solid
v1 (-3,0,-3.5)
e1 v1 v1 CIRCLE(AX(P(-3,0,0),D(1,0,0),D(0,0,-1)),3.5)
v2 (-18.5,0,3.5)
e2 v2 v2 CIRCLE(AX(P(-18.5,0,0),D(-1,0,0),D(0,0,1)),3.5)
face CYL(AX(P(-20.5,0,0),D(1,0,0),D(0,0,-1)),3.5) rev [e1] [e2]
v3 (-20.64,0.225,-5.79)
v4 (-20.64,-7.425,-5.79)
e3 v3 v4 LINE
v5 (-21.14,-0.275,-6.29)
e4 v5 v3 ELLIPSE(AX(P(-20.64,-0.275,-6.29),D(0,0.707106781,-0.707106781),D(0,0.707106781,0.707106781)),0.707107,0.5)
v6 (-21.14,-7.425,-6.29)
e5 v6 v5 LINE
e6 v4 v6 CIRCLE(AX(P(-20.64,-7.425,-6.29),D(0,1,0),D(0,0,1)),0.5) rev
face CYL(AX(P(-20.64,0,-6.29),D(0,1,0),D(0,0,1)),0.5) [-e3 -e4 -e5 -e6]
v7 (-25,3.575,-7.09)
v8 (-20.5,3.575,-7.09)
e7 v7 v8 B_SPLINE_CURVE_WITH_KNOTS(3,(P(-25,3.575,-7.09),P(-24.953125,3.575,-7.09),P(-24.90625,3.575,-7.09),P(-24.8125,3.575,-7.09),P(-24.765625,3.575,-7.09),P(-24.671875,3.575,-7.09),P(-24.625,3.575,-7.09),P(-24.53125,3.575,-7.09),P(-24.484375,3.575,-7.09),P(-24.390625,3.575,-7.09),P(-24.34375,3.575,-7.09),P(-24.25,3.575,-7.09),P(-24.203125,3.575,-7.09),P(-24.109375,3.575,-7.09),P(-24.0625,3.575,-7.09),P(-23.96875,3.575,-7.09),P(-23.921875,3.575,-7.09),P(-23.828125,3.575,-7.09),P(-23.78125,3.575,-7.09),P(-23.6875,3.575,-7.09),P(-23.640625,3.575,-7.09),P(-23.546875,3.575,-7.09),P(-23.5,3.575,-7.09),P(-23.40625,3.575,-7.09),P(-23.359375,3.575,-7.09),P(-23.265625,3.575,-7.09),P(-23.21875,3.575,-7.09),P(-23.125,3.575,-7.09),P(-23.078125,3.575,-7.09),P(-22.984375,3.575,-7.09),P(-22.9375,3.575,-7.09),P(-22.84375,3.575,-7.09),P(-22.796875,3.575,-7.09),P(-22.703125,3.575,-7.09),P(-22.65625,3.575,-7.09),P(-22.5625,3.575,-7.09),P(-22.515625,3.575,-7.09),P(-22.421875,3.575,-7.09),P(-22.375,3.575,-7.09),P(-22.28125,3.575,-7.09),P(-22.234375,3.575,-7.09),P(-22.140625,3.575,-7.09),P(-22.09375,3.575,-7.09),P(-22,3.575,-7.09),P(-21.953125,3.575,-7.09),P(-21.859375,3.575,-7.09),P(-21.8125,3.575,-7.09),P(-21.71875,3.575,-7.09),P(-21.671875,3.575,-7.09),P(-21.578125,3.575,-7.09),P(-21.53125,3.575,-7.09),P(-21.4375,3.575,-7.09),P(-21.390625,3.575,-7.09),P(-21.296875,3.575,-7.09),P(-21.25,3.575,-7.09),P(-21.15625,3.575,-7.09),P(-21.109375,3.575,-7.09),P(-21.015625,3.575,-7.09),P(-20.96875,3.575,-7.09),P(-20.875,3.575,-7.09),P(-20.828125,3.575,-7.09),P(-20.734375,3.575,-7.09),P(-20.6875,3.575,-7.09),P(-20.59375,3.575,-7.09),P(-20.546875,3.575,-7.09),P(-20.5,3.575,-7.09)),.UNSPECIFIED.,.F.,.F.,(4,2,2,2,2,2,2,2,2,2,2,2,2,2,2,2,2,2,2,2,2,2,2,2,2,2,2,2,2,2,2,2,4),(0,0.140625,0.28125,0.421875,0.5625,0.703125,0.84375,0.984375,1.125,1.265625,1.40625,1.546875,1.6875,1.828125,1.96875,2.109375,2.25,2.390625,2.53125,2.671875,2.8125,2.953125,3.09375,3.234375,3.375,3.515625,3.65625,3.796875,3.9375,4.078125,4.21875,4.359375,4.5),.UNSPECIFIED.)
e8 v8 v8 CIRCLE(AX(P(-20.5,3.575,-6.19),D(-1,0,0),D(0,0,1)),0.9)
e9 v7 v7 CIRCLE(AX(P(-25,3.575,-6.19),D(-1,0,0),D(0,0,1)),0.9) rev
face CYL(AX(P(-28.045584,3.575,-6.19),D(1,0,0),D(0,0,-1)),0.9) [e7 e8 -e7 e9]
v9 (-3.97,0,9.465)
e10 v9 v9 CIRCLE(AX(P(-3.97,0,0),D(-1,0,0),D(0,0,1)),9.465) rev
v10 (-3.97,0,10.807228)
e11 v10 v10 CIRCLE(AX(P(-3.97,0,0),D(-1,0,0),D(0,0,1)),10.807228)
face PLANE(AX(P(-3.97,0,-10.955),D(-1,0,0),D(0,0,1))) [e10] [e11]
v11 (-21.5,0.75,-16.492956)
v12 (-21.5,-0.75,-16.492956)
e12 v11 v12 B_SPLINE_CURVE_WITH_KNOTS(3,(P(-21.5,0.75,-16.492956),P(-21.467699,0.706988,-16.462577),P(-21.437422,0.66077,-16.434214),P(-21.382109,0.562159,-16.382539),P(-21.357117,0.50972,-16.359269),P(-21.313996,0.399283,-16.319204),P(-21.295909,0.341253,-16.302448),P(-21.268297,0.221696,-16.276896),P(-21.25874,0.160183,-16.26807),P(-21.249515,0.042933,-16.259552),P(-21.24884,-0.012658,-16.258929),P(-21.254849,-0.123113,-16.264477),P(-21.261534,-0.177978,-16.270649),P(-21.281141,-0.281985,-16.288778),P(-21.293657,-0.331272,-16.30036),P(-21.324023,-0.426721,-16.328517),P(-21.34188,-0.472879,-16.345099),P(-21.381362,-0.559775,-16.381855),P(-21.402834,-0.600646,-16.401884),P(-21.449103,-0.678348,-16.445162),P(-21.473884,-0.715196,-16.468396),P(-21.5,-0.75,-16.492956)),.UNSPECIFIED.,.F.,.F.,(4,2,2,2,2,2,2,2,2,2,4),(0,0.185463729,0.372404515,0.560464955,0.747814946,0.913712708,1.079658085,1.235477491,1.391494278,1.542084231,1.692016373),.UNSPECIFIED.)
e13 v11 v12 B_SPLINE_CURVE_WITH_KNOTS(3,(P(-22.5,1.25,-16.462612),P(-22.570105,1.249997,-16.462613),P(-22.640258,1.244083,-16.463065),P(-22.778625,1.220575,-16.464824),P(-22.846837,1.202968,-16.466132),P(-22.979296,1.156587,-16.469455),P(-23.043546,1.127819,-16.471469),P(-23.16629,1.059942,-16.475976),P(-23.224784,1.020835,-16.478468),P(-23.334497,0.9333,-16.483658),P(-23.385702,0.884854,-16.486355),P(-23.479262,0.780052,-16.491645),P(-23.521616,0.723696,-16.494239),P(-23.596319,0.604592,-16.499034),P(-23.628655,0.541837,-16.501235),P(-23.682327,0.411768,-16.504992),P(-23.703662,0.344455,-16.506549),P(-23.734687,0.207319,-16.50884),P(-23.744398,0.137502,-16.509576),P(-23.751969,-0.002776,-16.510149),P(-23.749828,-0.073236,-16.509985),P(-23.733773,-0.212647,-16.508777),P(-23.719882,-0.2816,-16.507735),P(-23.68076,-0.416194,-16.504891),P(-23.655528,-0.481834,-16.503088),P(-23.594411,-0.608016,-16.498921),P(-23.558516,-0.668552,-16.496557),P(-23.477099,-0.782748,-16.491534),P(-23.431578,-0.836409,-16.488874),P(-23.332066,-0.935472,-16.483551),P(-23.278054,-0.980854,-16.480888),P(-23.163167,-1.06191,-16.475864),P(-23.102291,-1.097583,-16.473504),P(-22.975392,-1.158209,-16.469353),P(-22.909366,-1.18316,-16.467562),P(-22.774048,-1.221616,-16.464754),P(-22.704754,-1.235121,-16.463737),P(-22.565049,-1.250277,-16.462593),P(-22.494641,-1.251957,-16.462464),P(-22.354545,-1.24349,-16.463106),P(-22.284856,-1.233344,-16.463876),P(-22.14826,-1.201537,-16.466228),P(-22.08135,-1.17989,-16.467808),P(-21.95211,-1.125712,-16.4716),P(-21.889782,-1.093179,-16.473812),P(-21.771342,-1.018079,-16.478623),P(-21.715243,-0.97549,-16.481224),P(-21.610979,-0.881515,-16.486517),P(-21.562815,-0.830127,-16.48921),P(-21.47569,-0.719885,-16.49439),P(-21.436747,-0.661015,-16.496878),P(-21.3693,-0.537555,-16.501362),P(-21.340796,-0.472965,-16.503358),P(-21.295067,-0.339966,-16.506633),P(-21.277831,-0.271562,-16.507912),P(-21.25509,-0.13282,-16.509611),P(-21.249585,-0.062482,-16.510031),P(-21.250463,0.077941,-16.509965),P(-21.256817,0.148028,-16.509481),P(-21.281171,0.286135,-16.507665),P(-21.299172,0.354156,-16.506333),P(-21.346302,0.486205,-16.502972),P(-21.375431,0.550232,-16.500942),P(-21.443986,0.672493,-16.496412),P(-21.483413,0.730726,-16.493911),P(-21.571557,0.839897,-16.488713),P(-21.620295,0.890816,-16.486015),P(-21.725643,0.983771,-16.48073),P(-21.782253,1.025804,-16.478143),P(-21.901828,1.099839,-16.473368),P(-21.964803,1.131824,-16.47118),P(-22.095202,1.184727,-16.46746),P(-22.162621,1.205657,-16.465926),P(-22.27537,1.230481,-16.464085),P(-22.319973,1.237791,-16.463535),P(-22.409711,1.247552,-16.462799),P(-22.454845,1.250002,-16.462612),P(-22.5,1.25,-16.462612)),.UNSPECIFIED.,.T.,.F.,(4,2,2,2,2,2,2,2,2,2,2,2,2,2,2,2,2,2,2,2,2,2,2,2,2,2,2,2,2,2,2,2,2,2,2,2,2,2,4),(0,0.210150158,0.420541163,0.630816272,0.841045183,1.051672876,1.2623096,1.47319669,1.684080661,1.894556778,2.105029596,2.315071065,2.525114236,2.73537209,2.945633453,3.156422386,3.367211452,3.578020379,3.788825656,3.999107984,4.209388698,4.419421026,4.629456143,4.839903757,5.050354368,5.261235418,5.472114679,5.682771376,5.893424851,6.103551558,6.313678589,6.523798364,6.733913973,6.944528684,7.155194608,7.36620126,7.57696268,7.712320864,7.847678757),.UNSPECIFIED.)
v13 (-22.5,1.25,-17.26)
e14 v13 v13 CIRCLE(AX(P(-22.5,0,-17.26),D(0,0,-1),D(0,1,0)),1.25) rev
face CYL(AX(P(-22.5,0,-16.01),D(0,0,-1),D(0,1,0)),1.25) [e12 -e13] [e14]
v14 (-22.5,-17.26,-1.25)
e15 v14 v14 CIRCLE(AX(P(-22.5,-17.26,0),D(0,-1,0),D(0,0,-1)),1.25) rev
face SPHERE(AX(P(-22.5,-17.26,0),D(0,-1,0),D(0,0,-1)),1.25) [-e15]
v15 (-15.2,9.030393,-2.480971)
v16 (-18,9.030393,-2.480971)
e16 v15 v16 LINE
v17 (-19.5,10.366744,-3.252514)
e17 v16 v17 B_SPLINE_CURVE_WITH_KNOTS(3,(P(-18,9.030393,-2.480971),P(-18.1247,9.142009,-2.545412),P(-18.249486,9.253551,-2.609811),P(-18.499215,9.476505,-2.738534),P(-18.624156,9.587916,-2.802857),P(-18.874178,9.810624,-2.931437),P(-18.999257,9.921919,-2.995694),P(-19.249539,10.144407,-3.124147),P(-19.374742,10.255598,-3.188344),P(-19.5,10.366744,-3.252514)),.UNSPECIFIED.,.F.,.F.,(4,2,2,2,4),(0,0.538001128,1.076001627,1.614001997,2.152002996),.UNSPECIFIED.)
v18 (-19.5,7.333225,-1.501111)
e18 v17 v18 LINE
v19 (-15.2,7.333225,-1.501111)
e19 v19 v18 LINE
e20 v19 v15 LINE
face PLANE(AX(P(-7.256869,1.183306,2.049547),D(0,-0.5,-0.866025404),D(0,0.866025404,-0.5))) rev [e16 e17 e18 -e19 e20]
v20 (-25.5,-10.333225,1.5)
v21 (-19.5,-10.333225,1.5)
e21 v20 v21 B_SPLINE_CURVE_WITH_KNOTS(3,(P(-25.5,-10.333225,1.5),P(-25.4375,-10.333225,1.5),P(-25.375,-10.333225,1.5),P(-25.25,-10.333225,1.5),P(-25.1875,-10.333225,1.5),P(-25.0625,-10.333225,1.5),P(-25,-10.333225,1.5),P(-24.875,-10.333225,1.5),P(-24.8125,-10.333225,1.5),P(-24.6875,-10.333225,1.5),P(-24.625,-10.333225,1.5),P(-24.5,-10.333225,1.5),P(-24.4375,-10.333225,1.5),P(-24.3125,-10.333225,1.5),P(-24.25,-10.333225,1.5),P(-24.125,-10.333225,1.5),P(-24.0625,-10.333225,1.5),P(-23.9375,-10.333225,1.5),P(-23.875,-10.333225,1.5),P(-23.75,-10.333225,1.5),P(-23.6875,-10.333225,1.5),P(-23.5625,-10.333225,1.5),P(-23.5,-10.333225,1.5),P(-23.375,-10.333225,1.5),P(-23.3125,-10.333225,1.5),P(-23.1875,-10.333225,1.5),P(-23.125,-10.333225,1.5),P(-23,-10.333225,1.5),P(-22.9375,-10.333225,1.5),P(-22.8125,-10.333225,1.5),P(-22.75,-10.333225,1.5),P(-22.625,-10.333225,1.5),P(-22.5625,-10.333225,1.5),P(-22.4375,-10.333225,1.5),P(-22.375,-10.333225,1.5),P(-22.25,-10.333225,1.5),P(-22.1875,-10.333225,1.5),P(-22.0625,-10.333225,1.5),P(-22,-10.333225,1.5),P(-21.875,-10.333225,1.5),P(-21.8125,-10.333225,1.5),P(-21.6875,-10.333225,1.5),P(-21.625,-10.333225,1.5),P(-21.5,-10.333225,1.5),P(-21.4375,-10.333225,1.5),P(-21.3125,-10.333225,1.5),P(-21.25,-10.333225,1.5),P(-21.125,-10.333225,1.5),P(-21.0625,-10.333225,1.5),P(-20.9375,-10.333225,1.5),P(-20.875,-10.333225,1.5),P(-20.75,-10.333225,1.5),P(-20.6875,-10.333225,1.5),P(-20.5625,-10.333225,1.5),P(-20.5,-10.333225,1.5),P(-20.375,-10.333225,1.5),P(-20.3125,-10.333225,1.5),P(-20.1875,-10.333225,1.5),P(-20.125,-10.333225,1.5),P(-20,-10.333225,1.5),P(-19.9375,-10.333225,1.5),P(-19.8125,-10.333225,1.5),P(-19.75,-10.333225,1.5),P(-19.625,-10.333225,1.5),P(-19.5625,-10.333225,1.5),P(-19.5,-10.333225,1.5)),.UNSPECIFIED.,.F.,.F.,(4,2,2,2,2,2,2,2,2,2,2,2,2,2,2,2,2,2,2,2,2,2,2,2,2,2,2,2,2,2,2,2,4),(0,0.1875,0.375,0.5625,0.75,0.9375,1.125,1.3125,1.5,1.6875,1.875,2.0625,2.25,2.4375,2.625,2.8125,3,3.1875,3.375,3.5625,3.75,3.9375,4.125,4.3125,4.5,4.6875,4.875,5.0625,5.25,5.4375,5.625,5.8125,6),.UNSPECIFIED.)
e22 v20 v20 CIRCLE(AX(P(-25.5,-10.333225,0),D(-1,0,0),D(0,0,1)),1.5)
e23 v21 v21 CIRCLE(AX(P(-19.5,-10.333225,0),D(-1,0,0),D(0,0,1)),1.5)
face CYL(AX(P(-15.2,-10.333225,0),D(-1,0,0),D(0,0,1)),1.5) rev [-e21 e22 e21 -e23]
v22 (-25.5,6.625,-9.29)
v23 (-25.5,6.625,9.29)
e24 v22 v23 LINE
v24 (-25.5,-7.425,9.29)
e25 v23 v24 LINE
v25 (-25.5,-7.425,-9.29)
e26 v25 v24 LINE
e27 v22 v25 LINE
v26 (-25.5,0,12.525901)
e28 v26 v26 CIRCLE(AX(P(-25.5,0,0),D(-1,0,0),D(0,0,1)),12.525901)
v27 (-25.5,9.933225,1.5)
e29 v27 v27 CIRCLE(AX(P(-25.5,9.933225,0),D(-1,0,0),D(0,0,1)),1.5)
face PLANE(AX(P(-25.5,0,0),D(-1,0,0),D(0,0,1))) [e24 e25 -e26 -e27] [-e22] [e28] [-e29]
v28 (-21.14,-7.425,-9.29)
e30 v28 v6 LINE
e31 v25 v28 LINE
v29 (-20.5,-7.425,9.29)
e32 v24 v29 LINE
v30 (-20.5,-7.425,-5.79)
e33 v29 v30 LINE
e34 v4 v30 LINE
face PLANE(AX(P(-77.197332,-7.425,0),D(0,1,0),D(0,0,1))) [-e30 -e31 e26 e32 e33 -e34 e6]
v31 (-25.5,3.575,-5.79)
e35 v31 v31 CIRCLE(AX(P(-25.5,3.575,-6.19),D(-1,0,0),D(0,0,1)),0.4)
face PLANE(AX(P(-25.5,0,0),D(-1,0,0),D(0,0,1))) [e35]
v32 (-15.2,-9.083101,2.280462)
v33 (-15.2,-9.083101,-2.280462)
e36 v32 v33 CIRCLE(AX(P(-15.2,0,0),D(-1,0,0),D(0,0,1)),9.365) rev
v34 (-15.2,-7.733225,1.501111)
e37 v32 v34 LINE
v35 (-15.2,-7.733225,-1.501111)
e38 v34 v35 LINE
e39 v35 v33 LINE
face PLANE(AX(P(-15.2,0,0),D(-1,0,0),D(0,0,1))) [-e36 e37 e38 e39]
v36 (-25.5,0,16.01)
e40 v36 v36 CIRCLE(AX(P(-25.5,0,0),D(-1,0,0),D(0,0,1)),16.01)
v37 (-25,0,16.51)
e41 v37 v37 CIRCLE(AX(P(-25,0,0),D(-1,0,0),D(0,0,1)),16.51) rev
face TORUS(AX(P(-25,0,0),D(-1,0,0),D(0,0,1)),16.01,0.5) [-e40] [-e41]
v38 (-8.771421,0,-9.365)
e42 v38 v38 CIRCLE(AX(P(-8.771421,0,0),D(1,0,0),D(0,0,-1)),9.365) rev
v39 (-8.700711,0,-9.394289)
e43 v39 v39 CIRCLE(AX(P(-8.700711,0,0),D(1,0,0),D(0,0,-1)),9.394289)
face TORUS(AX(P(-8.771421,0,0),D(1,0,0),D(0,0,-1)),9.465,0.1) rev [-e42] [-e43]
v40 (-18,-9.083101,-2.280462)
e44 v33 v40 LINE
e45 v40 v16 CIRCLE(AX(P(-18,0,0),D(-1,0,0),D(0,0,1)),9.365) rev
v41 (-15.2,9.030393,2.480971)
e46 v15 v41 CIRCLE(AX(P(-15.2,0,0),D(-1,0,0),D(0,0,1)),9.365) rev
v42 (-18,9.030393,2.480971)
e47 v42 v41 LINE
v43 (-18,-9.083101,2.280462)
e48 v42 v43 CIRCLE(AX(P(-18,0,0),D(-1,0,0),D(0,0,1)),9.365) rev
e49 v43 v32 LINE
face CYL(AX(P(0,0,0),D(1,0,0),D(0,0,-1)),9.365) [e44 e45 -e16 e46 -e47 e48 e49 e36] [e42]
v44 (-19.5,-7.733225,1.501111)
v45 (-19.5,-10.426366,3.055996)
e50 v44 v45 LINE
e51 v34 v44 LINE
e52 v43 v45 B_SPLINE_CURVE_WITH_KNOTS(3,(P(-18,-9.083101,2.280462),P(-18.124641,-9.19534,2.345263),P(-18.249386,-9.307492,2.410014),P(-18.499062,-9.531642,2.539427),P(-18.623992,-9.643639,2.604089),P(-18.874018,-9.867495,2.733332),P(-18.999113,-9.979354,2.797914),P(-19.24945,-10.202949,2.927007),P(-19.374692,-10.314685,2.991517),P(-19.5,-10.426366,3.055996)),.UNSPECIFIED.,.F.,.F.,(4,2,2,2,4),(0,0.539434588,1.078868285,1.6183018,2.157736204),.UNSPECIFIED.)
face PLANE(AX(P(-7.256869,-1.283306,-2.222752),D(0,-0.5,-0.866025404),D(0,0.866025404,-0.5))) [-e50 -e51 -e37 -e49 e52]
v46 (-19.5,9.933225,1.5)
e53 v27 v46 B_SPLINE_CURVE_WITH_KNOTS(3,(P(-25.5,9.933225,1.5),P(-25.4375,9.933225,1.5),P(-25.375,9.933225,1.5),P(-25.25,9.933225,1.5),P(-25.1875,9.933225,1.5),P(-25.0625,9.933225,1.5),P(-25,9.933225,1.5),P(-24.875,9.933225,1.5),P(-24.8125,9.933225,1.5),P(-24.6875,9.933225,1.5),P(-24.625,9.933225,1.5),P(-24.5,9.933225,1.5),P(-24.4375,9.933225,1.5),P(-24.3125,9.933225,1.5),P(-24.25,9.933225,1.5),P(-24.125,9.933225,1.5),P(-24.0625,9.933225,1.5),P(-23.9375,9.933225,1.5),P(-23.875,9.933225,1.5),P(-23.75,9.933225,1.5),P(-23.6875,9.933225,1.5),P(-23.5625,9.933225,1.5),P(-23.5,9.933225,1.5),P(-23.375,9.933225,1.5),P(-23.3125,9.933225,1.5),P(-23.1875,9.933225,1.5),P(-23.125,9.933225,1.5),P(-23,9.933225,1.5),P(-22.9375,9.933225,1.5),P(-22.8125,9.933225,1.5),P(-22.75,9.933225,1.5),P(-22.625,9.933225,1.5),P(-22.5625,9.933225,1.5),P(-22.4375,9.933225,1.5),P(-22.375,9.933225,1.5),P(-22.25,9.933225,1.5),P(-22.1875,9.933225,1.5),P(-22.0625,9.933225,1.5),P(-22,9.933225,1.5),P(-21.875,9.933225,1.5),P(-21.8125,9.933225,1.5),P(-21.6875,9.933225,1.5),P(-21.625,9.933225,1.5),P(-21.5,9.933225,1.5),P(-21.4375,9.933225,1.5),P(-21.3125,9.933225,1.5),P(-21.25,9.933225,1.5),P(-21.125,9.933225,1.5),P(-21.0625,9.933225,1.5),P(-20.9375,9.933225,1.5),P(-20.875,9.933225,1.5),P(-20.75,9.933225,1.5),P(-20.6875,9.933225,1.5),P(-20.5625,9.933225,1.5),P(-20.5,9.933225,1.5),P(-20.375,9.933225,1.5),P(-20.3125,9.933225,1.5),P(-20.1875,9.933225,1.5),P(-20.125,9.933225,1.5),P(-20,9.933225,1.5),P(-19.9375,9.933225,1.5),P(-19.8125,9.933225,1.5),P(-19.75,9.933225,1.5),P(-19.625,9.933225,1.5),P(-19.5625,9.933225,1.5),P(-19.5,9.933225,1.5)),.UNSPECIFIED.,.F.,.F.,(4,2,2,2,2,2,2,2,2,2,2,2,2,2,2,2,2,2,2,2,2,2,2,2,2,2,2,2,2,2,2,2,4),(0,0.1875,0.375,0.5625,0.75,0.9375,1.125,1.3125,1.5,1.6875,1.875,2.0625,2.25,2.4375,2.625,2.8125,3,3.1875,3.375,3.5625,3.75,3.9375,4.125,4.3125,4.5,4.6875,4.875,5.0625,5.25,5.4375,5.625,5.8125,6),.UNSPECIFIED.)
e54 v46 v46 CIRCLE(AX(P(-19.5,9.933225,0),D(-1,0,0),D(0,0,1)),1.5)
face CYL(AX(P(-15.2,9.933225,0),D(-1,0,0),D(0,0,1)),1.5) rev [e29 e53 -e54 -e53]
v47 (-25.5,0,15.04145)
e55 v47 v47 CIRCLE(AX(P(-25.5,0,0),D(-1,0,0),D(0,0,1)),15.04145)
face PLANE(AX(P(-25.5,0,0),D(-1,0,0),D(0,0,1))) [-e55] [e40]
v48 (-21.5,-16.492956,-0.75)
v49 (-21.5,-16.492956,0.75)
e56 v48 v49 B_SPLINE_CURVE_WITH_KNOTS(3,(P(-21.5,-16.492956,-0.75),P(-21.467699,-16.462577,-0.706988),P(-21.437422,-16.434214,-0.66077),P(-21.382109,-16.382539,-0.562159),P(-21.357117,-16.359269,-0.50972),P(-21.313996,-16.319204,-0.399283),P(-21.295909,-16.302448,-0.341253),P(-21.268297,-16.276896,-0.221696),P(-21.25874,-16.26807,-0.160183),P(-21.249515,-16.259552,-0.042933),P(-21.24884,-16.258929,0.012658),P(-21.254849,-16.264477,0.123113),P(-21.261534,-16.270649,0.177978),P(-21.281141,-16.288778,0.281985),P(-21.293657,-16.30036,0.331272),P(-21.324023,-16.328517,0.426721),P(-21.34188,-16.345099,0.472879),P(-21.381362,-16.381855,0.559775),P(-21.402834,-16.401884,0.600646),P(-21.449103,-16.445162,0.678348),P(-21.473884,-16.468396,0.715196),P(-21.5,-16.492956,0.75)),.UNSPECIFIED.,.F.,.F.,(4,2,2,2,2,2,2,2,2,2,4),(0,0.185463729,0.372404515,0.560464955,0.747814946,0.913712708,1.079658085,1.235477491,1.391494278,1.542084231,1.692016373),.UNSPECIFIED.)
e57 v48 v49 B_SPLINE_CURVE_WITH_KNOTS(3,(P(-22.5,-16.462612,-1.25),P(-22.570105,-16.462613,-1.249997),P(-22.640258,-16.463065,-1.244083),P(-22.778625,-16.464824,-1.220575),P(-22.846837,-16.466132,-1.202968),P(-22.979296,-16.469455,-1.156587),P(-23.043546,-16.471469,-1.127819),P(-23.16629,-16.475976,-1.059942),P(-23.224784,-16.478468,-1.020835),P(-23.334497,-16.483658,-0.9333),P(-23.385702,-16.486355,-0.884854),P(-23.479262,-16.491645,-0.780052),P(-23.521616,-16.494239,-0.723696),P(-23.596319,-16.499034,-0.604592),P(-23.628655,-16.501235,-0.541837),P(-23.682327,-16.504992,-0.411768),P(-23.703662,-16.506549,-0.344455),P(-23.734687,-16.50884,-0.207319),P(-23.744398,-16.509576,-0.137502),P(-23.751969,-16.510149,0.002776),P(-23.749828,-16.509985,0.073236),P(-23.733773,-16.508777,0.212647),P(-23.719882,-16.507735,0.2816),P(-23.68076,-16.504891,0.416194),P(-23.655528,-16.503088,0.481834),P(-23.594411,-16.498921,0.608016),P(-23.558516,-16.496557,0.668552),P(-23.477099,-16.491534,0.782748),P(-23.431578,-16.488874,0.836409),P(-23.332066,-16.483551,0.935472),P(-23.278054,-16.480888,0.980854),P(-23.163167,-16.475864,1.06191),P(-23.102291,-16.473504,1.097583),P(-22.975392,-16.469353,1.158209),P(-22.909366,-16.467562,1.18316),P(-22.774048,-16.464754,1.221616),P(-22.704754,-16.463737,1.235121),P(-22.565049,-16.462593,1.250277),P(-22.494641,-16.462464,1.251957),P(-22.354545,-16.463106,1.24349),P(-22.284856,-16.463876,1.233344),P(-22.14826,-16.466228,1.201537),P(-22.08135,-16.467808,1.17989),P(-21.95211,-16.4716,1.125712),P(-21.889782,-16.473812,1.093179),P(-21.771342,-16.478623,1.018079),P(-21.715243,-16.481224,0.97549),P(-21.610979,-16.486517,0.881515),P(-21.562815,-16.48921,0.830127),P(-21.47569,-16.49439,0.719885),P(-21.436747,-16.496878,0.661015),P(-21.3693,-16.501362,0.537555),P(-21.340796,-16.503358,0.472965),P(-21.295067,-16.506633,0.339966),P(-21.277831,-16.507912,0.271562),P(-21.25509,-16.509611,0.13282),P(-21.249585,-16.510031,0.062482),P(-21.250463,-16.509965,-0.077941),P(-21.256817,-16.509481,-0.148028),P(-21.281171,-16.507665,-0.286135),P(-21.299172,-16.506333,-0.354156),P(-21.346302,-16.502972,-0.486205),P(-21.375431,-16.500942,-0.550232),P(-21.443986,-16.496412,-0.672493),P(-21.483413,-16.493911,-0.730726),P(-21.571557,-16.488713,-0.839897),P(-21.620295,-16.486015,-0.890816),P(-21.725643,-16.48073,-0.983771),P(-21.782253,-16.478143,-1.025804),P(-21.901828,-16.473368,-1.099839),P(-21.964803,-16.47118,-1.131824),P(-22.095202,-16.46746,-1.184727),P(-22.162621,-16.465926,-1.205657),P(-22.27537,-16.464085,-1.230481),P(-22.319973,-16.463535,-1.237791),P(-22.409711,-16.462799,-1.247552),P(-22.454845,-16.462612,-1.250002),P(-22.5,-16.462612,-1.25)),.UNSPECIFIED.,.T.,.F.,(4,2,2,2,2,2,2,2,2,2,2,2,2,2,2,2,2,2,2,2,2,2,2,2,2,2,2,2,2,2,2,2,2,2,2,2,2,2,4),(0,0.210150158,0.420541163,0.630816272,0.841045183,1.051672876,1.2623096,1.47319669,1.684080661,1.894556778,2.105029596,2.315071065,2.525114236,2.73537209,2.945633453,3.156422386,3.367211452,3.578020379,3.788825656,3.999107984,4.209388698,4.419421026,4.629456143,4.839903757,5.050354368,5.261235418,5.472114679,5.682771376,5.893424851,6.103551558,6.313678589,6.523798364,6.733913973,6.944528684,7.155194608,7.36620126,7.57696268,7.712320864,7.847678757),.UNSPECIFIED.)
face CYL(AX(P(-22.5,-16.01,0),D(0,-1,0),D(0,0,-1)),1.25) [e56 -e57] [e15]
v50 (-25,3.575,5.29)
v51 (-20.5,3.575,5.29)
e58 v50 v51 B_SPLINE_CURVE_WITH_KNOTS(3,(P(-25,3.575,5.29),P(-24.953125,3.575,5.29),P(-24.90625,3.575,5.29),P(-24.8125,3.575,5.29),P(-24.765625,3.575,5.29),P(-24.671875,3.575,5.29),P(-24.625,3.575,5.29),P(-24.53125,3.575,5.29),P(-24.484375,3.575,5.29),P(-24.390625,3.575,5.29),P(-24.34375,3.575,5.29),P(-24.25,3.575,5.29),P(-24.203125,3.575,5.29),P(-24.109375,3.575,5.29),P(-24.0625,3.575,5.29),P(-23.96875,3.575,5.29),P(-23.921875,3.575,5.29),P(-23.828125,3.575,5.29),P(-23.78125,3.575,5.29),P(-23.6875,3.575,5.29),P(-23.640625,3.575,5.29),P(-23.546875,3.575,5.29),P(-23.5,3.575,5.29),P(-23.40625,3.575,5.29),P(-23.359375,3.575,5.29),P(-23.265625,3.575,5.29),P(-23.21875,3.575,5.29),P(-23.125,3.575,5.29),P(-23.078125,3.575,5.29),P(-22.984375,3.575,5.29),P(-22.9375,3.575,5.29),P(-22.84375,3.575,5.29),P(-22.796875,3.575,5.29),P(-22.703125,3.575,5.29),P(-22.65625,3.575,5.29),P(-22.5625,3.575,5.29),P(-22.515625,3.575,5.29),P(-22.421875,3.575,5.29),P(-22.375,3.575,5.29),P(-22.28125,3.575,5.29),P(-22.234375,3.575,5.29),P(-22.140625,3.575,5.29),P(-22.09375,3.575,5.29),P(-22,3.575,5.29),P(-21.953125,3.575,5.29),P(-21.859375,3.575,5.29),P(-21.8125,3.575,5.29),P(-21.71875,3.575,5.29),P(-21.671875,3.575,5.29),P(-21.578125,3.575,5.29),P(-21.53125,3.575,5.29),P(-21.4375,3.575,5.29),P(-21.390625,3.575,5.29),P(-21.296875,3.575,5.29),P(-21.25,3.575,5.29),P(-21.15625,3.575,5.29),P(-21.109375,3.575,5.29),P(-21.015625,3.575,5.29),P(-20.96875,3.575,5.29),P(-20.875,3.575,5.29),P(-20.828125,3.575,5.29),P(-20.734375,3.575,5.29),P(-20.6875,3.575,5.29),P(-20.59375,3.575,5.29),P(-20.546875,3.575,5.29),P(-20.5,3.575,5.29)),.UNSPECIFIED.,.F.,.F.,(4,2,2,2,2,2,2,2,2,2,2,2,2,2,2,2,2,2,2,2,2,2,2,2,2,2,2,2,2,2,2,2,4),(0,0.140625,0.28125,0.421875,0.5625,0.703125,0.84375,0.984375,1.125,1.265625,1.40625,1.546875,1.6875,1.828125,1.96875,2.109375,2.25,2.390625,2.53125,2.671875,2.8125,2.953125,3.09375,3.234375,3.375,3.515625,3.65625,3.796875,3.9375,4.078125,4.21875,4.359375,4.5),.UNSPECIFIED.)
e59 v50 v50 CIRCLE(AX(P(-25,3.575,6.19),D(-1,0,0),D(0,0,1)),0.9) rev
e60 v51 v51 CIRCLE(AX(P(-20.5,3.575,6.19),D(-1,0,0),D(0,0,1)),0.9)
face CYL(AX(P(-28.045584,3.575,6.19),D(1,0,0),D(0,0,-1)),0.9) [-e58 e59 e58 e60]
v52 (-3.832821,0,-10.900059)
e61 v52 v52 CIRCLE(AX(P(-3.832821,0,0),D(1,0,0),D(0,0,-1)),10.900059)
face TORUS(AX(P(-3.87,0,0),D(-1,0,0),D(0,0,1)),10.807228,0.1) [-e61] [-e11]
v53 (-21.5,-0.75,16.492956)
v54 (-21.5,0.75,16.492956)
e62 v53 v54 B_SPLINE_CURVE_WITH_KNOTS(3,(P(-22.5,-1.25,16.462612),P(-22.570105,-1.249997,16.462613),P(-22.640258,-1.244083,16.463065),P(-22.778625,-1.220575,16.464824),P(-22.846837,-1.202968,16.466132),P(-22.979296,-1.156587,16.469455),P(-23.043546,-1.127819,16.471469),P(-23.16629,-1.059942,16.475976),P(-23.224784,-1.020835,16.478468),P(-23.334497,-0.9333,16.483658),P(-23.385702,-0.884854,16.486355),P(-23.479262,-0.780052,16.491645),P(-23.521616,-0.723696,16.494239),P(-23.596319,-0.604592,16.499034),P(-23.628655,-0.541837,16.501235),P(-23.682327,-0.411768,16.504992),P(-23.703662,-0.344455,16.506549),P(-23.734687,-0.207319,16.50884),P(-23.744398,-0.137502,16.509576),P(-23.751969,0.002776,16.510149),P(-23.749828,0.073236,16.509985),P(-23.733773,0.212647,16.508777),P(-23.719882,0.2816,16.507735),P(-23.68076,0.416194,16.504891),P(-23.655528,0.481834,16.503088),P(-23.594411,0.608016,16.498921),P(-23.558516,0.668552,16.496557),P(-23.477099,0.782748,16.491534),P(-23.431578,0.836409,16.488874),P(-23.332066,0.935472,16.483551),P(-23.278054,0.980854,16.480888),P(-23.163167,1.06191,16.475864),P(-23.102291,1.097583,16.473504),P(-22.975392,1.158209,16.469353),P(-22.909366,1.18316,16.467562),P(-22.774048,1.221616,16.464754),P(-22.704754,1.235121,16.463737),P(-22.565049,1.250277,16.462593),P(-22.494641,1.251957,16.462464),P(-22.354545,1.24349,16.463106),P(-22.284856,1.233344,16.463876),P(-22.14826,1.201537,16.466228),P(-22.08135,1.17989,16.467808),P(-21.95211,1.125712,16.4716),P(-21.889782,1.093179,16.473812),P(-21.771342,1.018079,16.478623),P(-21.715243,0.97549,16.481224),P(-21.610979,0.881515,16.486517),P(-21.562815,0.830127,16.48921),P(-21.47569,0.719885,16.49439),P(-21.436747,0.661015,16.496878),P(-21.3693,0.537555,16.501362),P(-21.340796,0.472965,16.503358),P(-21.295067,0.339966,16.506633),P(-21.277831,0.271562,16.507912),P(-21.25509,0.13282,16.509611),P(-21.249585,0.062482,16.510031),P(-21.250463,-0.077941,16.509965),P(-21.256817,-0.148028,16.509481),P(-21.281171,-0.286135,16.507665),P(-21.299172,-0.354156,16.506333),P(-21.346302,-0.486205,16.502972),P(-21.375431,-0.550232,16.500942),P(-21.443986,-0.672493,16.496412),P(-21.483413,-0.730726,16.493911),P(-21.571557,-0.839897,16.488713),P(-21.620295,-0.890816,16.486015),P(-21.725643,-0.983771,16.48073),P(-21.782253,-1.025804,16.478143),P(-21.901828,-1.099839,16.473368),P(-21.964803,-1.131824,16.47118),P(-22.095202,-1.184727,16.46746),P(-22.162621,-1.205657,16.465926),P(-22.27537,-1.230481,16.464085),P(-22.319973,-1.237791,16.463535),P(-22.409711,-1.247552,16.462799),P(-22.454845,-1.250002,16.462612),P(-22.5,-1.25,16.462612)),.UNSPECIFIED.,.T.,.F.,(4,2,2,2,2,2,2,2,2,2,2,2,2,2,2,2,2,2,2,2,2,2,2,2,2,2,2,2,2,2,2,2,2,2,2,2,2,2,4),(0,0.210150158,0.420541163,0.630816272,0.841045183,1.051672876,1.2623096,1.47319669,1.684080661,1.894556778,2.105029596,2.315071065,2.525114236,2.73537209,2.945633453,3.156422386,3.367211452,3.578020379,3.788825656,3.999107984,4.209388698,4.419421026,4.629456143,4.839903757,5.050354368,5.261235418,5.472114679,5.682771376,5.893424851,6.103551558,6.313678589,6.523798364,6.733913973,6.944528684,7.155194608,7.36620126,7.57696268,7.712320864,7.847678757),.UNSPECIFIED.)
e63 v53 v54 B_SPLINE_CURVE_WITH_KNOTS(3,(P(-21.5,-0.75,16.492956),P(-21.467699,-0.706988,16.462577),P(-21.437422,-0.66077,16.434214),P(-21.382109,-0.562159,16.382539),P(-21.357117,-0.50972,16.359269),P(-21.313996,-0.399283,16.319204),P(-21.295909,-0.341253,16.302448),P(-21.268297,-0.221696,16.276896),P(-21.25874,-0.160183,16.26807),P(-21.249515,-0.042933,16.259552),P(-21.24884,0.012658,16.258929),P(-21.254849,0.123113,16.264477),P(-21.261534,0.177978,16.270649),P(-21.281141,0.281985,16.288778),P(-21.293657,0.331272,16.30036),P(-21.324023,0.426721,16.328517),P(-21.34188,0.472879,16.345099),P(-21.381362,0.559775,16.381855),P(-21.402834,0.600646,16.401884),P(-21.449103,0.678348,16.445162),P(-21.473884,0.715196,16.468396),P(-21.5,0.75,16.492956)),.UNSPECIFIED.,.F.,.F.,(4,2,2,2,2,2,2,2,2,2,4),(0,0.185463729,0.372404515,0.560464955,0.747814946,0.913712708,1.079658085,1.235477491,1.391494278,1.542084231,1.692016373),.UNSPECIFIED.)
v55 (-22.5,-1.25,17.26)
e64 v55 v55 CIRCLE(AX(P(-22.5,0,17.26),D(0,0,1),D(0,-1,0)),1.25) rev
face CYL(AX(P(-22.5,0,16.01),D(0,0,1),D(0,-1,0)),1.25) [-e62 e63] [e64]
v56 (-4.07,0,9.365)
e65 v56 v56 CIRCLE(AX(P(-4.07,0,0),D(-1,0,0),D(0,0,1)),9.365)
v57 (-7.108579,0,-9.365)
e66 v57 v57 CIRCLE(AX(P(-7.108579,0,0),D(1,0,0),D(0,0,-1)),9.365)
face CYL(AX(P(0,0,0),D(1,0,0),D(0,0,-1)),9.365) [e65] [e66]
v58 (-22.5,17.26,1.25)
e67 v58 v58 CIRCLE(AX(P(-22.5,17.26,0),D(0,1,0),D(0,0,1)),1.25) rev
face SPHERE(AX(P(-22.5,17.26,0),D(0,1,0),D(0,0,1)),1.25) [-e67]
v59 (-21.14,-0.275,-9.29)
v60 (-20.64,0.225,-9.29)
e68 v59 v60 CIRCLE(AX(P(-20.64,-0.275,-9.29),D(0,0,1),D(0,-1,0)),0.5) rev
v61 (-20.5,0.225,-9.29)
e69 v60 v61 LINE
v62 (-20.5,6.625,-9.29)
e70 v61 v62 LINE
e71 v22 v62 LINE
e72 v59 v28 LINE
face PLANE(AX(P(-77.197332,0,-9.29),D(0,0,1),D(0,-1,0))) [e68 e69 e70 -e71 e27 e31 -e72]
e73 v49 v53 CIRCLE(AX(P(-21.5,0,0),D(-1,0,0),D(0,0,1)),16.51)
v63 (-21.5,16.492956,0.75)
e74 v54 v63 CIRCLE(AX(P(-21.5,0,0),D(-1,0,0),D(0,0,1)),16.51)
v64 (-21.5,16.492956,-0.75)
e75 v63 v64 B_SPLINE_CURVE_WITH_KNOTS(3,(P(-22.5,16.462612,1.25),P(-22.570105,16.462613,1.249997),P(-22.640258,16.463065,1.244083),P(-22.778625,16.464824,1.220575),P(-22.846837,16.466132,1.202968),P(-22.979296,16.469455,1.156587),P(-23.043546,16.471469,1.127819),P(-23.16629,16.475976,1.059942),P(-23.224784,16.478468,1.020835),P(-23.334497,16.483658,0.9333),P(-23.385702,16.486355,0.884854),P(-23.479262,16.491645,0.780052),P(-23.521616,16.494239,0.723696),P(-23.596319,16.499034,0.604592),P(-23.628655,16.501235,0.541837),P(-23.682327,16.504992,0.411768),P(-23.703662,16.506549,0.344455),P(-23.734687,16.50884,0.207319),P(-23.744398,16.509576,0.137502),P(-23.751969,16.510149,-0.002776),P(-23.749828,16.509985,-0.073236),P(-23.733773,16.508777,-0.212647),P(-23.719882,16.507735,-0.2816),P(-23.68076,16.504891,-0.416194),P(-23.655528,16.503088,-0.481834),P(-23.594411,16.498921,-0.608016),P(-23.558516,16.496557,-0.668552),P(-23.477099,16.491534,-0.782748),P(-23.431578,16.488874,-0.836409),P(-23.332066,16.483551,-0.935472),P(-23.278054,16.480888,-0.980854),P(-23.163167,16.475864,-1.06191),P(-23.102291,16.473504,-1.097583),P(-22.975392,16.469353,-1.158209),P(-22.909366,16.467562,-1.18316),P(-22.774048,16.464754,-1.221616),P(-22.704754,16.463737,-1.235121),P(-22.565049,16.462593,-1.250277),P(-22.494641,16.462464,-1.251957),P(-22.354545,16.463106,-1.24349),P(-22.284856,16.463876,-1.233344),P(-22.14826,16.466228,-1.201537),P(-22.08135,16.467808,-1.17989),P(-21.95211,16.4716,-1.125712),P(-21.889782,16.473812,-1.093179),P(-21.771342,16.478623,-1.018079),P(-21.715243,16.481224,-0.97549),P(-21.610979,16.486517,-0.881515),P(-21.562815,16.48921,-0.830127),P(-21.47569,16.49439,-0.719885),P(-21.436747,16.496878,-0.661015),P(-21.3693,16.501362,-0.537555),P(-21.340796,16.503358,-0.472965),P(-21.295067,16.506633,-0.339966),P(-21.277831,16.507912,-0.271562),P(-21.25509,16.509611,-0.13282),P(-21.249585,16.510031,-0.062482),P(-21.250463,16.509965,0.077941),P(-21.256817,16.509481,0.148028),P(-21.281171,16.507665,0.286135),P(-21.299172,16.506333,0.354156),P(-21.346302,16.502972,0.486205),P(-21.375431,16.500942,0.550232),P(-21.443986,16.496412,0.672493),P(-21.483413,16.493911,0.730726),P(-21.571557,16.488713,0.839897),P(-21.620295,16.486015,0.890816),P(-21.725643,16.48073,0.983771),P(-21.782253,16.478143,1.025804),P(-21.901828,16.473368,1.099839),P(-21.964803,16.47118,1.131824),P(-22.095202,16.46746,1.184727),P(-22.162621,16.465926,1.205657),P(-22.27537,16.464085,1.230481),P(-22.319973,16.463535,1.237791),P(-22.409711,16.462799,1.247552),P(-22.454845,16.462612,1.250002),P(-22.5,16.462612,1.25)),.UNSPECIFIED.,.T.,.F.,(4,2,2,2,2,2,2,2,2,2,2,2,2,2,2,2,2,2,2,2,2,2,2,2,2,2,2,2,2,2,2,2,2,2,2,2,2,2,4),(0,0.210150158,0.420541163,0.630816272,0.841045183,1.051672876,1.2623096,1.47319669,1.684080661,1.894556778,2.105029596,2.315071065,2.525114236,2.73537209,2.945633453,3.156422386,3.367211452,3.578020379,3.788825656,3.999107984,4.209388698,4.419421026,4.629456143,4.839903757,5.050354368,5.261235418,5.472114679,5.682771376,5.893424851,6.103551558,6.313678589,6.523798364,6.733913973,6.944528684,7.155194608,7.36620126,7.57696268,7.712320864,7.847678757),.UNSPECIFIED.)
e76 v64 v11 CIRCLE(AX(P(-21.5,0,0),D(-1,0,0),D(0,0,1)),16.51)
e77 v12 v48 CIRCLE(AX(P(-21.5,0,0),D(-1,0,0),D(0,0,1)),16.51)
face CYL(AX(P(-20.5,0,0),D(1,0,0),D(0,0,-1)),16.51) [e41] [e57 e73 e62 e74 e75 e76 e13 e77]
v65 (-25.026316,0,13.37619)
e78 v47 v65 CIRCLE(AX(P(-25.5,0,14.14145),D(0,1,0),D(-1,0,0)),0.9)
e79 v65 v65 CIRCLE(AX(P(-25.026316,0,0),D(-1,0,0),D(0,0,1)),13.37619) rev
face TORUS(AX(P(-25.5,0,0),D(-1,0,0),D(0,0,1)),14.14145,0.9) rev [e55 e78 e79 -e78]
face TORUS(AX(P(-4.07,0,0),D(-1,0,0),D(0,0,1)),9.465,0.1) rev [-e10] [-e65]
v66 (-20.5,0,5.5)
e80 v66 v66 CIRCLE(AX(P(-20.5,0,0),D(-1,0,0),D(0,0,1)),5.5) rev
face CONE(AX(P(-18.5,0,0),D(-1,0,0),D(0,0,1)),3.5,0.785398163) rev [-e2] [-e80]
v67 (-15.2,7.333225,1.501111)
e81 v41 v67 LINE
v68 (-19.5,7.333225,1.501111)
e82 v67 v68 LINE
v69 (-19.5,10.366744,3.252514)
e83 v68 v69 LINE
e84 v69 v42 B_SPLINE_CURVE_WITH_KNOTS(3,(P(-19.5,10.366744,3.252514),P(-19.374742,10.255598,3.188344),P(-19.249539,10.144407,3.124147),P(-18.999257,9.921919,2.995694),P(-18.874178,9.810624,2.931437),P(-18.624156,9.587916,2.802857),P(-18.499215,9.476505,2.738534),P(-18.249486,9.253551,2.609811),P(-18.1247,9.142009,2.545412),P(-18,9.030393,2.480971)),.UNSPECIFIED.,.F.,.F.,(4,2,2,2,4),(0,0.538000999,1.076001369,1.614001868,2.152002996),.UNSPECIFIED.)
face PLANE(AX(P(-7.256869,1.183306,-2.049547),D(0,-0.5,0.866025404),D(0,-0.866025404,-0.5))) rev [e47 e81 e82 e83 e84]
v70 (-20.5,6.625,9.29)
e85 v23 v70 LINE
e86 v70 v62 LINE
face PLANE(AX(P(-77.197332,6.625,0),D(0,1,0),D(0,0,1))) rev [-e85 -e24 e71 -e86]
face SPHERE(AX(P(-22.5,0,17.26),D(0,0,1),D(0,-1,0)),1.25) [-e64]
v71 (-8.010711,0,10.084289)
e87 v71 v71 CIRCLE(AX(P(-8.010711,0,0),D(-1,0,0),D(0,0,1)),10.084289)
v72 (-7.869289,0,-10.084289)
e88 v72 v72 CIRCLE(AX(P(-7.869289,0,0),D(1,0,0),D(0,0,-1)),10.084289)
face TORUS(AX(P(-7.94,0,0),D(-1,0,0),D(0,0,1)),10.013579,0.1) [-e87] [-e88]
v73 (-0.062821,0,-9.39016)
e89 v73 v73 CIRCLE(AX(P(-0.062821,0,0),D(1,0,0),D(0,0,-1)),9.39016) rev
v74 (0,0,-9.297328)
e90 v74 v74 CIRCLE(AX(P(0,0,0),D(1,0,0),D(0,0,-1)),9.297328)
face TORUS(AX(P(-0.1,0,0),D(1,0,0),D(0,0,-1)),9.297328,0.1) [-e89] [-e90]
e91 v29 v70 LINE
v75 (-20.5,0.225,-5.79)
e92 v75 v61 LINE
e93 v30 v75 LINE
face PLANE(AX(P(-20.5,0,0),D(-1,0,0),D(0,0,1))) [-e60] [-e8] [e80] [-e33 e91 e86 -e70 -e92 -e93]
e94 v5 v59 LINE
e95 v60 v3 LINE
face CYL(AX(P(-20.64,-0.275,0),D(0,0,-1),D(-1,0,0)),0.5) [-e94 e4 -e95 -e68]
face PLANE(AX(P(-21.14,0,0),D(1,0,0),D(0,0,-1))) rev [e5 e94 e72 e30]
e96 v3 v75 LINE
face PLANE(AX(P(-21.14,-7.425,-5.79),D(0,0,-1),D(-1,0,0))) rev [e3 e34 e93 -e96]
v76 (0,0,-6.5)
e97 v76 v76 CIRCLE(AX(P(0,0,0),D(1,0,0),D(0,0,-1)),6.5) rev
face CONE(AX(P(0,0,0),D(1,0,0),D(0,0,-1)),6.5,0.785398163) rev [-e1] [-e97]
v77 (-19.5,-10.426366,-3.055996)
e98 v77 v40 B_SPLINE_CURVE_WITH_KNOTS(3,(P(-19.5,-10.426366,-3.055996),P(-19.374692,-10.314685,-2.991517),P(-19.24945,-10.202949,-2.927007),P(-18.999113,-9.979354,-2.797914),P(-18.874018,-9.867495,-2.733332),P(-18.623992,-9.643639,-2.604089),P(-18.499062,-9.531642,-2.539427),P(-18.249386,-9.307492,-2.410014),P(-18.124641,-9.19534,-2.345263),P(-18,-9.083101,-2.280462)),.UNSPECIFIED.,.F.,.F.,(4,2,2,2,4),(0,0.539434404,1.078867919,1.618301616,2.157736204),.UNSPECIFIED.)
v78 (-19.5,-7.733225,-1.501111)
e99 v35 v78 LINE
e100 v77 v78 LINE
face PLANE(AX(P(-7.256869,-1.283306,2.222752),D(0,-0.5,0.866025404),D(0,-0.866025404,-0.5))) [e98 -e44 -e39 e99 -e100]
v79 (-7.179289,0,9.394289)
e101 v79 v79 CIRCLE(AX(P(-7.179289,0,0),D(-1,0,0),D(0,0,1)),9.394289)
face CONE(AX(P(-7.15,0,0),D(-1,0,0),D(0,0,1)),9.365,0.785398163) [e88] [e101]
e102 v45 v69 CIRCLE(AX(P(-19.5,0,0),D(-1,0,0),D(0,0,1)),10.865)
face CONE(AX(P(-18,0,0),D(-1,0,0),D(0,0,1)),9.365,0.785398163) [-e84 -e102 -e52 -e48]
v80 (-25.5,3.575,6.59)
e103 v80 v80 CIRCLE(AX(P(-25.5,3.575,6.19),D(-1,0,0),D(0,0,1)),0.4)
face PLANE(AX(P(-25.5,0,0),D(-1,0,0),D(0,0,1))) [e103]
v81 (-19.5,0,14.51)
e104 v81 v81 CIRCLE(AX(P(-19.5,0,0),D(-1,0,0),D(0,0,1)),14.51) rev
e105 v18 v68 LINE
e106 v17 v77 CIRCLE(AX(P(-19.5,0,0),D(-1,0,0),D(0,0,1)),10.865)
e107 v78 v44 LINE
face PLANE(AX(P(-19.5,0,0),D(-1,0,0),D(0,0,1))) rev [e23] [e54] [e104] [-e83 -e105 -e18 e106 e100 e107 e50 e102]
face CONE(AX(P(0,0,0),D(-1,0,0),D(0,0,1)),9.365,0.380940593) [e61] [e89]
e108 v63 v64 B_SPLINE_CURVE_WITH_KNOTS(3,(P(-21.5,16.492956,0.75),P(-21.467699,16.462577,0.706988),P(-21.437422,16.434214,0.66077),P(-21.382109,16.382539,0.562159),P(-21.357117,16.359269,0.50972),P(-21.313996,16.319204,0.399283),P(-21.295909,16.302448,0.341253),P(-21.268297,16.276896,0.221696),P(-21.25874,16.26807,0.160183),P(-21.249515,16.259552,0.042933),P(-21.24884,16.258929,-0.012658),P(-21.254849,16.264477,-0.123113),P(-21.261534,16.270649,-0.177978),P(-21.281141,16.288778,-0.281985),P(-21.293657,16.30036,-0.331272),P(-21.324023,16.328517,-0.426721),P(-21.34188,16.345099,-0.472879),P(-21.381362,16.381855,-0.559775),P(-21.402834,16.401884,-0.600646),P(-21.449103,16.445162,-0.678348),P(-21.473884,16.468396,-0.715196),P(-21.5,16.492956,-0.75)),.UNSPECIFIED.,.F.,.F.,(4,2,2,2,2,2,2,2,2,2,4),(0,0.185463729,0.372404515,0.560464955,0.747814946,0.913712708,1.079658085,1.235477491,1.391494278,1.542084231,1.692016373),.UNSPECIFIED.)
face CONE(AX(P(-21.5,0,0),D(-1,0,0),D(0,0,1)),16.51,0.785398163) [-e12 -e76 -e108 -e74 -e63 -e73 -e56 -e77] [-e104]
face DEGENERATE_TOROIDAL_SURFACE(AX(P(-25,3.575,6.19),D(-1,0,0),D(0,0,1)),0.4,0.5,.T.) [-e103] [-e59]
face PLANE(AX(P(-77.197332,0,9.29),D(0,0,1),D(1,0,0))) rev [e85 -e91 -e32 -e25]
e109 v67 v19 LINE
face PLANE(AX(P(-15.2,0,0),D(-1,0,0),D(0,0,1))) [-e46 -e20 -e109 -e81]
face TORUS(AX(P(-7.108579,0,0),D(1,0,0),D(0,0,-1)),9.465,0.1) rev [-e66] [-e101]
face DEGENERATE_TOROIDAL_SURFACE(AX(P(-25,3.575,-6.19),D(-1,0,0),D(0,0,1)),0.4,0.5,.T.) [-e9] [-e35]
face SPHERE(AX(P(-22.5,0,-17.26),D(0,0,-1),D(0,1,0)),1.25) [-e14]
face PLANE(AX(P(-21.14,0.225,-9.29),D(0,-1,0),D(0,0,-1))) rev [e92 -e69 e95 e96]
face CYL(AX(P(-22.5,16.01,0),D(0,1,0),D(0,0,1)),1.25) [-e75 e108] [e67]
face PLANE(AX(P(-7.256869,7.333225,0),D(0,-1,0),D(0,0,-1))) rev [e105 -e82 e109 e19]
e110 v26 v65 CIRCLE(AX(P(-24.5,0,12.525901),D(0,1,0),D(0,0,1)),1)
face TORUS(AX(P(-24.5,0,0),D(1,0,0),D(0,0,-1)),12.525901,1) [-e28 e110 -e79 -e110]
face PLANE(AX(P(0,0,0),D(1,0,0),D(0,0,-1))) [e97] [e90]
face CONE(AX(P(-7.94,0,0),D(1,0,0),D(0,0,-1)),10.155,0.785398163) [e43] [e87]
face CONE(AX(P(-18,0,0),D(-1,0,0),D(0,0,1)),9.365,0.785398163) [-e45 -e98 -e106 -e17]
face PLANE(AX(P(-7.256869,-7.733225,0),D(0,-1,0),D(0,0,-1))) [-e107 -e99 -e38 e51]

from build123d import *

# Parameters (mm, degrees)
SKETCH2_R            = 16.51
SKETCH2_R_2          = 3.5
BOSS_EXTRUDE1_DEPTH  = 1
SKETCH2_5_R          = 3.5
SKETCH2_5_W          = 2.46
SKETCH2_5_H          = 4.35
CUT_EXTRUDE1_DEPTH   = 31.42055555
BOSS_EXTRUDE4_START  = 1
SKETCH2_6_R          = 16.51
SKETCH2_6_W          = 18.58
SKETCH2_6_H          = 14.05
BOSS_EXTRUDE4_DEPTH  = 5
BOSS_EXTRUDE3_START  = 1
SKETCH2_4_R          = 0.9
BOSS_EXTRUDE3_DEPTH  = 5
FILLET1_R            = 0.1
FILLET4_R            = 0.5
CUT_SWEEP1_PROFILE_R = 0.9
SKETCH17_R           = 1.25
BOSS_EXTRUDE5_DEPTH  = 2
SKETCH17_3_R         = 1.25
BOSS_EXTRUDE6_DEPTH  = 0.5
FILLET6_R            = 1.25
CHAMFER1_SIZE        = 2
SKETCH18_W           = 3.5
SKETCH18_H           = 7.65
BOSS_EXTRUDE7_DEPTH  = 0.64
FILLET7_R            = 0.5
CHAMFER2_SIZE        = 2
SKETCH21_R           = 1.5
CUT_EXTRUDE2_DEPTH   = 10.3
CUT_EXTRUDE3_START   = -6
SKETCH21_4_R         = 1.5
CUT_EXTRUDE3_DEPTH   = 4.3
CHAMFER3_SIZE        = 3
FILLET8_R            = 1
CHAMFER4_SIZE        = 1.5
FILLET9_R            = 0.5


# Read off the part's stored shape, not the designer's step: CirPattern10
with BuildPart() as part:
    # Sketch1 → Revolve1 (revolve)
    with BuildSketch(Plane(origin=(0, 0, 0), x_dir=(1, 0, 0), z_dir=(0, 1, 0))):
        Polygon((0, 0), (-19.5, 0), (-19.5, 9.365), (-8.73, 9.365), (-7.94, 10.155), (-7.15, 9.365), (-3.97, 9.365), (-3.97, 10.955), (0, 9.365), align=None)
    revolve(axis=Axis((0, 0, 0), (-1, 0, 0)))

    # Sketch2 → Boss-Extrude1 (add)
    with BuildSketch(Plane.ZY.offset(19.5)):
        Circle(SKETCH2_R)
        Circle(SKETCH2_R_2, mode=Mode.SUBTRACT)
    extrude(amount=BOSS_EXTRUDE1_DEPTH)

    # Sketch2<5> → Cut-Extrude1 (cut, through all)
    # profile 1 of 2: a face of its own
    with BuildSketch(Plane.ZY.offset(19.5)):
        Circle(SKETCH2_5_R)
        with Locations((-0.31, 0.56)):
            Rectangle(SKETCH2_5_W, SKETCH2_5_H, mode=Mode.SUBTRACT)
    # profile 2 of 2: a face of its own
    with BuildSketch(Plane.ZY.offset(19.5)):
        with Locations((-0.31, 0.56)):
            Rectangle(SKETCH2_5_W, SKETCH2_5_H)
    extrude(amount=-CUT_EXTRUDE1_DEPTH, mode=Mode.SUBTRACT)

    # Sketch2<6> → Boss-Extrude4 (add)
    with BuildSketch(Plane.ZY.offset(19.5).offset(BOSS_EXTRUDE4_START)):
        Circle(SKETCH2_6_R)
        with Locations((0, -0.4)):
            Rectangle(SKETCH2_6_W, SKETCH2_6_H, mode=Mode.SUBTRACT)
    extrude(amount=BOSS_EXTRUDE4_DEPTH)

    # Sketch2<4> → Boss-Extrude3 (add)
    with BuildSketch(Plane.ZY.offset(19.5).offset(BOSS_EXTRUDE3_START)):
        with Locations(Location((6.19, 3.575, 0), (0, 0, 180))):
            Circle(SKETCH2_4_R)
        with Locations(Location((-6.19, 3.575, 0), (0, 0, 180))):
            Circle(SKETCH2_4_R)
    extrude(amount=BOSS_EXTRUDE3_DEPTH)

    # Fillet1
    fillet1_edges = [part.edges().sort_by_distance(p)[0] for p in [
        (-3.97, 0, 9.365),
        (-3.97, 0, 10.955),
        (0, 0, 9.365),
        (-8.73, 0, 9.365),
        (-7.94, 0, 10.155),
        (-7.15, 0, 9.365),
    ]]
    fillet(fillet1_edges, radius=FILLET1_R)

    # Fillet4
    fillet4_edges = [part.edges().sort_by_distance(p)[0] for p in [
        (-25.5, 3.575, 7.09),
        (-25.5, 3.575, -5.29),
    ]]
    fillet(fillet4_edges, radius=FILLET4_R)

    # Cut-Sweep1: sweep along a path in Sketch8
    with BuildLine(Plane.ZY.offset(25.5)) as cut_sweep1_path:
        CenterArc((0, 0), 14.14145, 0, 360)
    # Cut-Sweep1 profile (on start of the path) → Cut-Sweep1 (sweep, cut)
    with BuildSketch(Plane(origin=(-25.5, 0, 14.14145), x_dir=(0, 0, 1), z_dir=(0, 1, 0))):
        Circle(CUT_SWEEP1_PROFILE_R)
    sweep(path=cut_sweep1_path.line, mode=Mode.SUBTRACT)



with BuildPart() as body_2:
    # Sketch17 → Boss-Extrude5 (new body)
    with BuildSketch(Plane(origin=(0, -16.51, 0), x_dir=(-1, 0, 0), z_dir=(0, -1, 0))):
        with Locations(Location((22.5, 0, 0), (0, 0, 90))):
            Circle(SKETCH17_R)
    extrude(amount=BOSS_EXTRUDE5_DEPTH)


with BuildPart() as part_1:
    add(part.part)

    add(body_2.part)  # Boss-Extrude6 merges body 2
    # Sketch17<3> → Boss-Extrude6 (add)
    with BuildSketch(Plane(origin=(0, -16.51, 0), x_dir=(-1, 0, 0), z_dir=(0, -1, 0))):
        with Locations(Location((22.5, 0, 0), (0, 0, 90))):
            Circle(SKETCH17_3_R)
    extrude(amount=-BOSS_EXTRUDE6_DEPTH)

    # Fillet6
    fillet6_edges = [part_1.edges().sort_by_distance(p)[0] for p in [
        (-22.5, -18.51, 1.25),
    ]]
    fillet(fillet6_edges, radius=FILLET6_R)

    # CirPattern10 outline → CirPattern10 (revolve)
    with BuildSketch(Plane(origin=(-22.5, 0, 0), x_dir=(1, 0, 0), z_dir=(0, 0, 1))):
        with BuildLine():
            Line((0, 16.462586639), (1.25, 16.462586639))
            Line((1.25, 16.462586639), (1.25, 17.259999999))
            ThreePointArc((1.25, 17.259999999), (0.883883477, 18.143883476), (0, 18.51))
            Line((0, 18.51), (0, 16.462586639))
        make_face()
    revolve(axis=Axis((-22.5, 0, 0), (0, 1, 0)))

    # CirPattern10 2 outline → CirPattern10 2 (revolve)
    with BuildSketch(Plane(origin=(-22.5, 0, 0), x_dir=(1, 0, 0), z_dir=(0, -1, 0))):
        with BuildLine():
            Line((1.25, 16.462592789), (1.25, 17.259999999))
            ThreePointArc((1.25, 17.259999999), (0.883883477, 18.143883476), (0, 18.51))
            Line((0, 18.51), (0, 16.462592789))
            Line((0, 16.462592789), (1.25, 16.462592789))
        make_face()
        with BuildLine():
            Line((1.25, -17.259999999), (1.25, -16.462586639))
            Line((1.25, -16.462586639), (0, -16.462586639))
            Line((0, -16.462586639), (0, -18.51))
            ThreePointArc((0, -18.51), (0.883883477, -18.143883476), (1.25, -17.259999999))
        make_face()
    revolve(axis=Axis((-22.5, 0, 0), (0, 0, 1)))

    # Chamfer1
    # the kernel refuses this chamfer: 2 mm, written as the material it takes off along each edge
    with BuildSketch(Plane(origin=(-19.5, 0, 0), x_dir=(0, 0, 1), z_dir=(0, -1, 0))) as chamfer1_piece_1_section:
        Polygon((16.51, CHAMFER1_SIZE), (16.51 - CHAMFER1_SIZE, 0), (16.51, 0), align=None)
    chamfer1_piece_1 = revolve(axis=Axis((-19.5, 0, 0), (-1, 0, 0)), mode=Mode.PRIVATE)
    chamfer1_piece_1 = chamfer1_piece_1 - Plane(origin=(-22.5, 0, 0), x_dir=(0, 0, -1), z_dir=(0, -1, 0)) * Cylinder(1.25, 67, mode=Mode.PRIVATE)
    chamfer1_piece_1 = chamfer1_piece_1 - Plane(origin=(-22.5, 0, -15.552620412), x_dir=(1, 0, 0), z_dir=(0, 0, 1)) * Cylinder(1.25, 67, mode=Mode.PRIVATE)
    add(chamfer1_piece_1, mode=Mode.SUBTRACT)

    # Sketch18 → Boss-Extrude7 (add)
    with BuildSketch(Plane.ZY.offset(20.5)):
        with Locations((-7.54, -3.6)):
            Rectangle(SKETCH18_W, SKETCH18_H)
    extrude(amount=BOSS_EXTRUDE7_DEPTH)

    # Fillet7
    fillet7_edges = [part_1.edges().sort_by_distance(p)[0] for p in [
        (-21.14, -3.6, -5.79),
        (-21.14, 0.225, -7.54),
    ]]
    fillet(fillet7_edges, radius=FILLET7_R)

    # Chamfer2
    chamfer2_edges = [part_1.edges().sort_by_distance(p)[0] for p in [
        (-20.5, 0, -3.5),
    ]]
    chamfer(chamfer2_edges, length=CHAMFER2_SIZE)

    # Sketch21 → Cut-Extrude2 (cut)
    with BuildSketch(Plane.ZY.offset(25.5)):
        with Locations((0, -10.333225)):
            Circle(SKETCH21_R)
        with Locations((0, 9.933225)):
            Circle(SKETCH21_R)
    extrude(amount=-CUT_EXTRUDE2_DEPTH, mode=Mode.SUBTRACT)

    # Sketch21<4> → Cut-Extrude3 (cut)
    with BuildSketch(Plane.ZY.offset(25.5).offset(CUT_EXTRUDE3_START)):
        with Locations((0, 9.933225)):
            Circle(SKETCH21_4_R)
        Polygon((3.0022214, 9.933225), (-3.0022214, 9.933225), (-1.5011107, 12.533225), (1.5011107, 12.533225), align=None)
        Polygon((3.0022214, 9.933225), (-3.0022214, 9.933225), (-1.5011107, 7.333225), (1.5011107, 7.333225), align=None)
        with Locations((0, -10.333225)):
            Circle(SKETCH21_4_R)
        Polygon((-3.0022214, -10.333225), (3.0022214, -10.333225), (1.5011107, -7.733225), (-1.5011107, -7.733225), align=None)
        Polygon((-3.0022214, -10.333225), (3.0022214, -10.333225), (1.5011107, -12.933225), (-1.5011107, -12.933225), align=None)
    extrude(amount=-CUT_EXTRUDE3_DEPTH, mode=Mode.SUBTRACT)

    # Chamfer3
    chamfer3_edges = [part_1.edges().sort_by_distance(p)[0] for p in [
        (0, 0, -3.5),
    ]]
    chamfer(chamfer3_edges, length=CHAMFER3_SIZE)

    # Fillet8
    fillet8_edges = [part_1.edges().sort_by_distance(p)[0] for p in [
        (-25.5, 0, -13.24145),
    ]]
    fillet(fillet8_edges, radius=FILLET8_R)

    # Chamfer4
    chamfer4_edges = [part_1.edges().sort_by_distance(p)[0] for p in [
        (-19.5, -0.103660668, 9.364426275),
        (-19.5, -5.759631068, -7.38443464),
    ]]
    chamfer(chamfer4_edges, length=CHAMFER4_SIZE)

    # Fillet9
    fillet9_edges = [part_1.edges().sort_by_distance(p)[0] for p in [
        (-25.5, 0, -16.51),
    ]]
    fillet(fillet9_edges, radius=FILLET9_R)


solid = part_1.part
